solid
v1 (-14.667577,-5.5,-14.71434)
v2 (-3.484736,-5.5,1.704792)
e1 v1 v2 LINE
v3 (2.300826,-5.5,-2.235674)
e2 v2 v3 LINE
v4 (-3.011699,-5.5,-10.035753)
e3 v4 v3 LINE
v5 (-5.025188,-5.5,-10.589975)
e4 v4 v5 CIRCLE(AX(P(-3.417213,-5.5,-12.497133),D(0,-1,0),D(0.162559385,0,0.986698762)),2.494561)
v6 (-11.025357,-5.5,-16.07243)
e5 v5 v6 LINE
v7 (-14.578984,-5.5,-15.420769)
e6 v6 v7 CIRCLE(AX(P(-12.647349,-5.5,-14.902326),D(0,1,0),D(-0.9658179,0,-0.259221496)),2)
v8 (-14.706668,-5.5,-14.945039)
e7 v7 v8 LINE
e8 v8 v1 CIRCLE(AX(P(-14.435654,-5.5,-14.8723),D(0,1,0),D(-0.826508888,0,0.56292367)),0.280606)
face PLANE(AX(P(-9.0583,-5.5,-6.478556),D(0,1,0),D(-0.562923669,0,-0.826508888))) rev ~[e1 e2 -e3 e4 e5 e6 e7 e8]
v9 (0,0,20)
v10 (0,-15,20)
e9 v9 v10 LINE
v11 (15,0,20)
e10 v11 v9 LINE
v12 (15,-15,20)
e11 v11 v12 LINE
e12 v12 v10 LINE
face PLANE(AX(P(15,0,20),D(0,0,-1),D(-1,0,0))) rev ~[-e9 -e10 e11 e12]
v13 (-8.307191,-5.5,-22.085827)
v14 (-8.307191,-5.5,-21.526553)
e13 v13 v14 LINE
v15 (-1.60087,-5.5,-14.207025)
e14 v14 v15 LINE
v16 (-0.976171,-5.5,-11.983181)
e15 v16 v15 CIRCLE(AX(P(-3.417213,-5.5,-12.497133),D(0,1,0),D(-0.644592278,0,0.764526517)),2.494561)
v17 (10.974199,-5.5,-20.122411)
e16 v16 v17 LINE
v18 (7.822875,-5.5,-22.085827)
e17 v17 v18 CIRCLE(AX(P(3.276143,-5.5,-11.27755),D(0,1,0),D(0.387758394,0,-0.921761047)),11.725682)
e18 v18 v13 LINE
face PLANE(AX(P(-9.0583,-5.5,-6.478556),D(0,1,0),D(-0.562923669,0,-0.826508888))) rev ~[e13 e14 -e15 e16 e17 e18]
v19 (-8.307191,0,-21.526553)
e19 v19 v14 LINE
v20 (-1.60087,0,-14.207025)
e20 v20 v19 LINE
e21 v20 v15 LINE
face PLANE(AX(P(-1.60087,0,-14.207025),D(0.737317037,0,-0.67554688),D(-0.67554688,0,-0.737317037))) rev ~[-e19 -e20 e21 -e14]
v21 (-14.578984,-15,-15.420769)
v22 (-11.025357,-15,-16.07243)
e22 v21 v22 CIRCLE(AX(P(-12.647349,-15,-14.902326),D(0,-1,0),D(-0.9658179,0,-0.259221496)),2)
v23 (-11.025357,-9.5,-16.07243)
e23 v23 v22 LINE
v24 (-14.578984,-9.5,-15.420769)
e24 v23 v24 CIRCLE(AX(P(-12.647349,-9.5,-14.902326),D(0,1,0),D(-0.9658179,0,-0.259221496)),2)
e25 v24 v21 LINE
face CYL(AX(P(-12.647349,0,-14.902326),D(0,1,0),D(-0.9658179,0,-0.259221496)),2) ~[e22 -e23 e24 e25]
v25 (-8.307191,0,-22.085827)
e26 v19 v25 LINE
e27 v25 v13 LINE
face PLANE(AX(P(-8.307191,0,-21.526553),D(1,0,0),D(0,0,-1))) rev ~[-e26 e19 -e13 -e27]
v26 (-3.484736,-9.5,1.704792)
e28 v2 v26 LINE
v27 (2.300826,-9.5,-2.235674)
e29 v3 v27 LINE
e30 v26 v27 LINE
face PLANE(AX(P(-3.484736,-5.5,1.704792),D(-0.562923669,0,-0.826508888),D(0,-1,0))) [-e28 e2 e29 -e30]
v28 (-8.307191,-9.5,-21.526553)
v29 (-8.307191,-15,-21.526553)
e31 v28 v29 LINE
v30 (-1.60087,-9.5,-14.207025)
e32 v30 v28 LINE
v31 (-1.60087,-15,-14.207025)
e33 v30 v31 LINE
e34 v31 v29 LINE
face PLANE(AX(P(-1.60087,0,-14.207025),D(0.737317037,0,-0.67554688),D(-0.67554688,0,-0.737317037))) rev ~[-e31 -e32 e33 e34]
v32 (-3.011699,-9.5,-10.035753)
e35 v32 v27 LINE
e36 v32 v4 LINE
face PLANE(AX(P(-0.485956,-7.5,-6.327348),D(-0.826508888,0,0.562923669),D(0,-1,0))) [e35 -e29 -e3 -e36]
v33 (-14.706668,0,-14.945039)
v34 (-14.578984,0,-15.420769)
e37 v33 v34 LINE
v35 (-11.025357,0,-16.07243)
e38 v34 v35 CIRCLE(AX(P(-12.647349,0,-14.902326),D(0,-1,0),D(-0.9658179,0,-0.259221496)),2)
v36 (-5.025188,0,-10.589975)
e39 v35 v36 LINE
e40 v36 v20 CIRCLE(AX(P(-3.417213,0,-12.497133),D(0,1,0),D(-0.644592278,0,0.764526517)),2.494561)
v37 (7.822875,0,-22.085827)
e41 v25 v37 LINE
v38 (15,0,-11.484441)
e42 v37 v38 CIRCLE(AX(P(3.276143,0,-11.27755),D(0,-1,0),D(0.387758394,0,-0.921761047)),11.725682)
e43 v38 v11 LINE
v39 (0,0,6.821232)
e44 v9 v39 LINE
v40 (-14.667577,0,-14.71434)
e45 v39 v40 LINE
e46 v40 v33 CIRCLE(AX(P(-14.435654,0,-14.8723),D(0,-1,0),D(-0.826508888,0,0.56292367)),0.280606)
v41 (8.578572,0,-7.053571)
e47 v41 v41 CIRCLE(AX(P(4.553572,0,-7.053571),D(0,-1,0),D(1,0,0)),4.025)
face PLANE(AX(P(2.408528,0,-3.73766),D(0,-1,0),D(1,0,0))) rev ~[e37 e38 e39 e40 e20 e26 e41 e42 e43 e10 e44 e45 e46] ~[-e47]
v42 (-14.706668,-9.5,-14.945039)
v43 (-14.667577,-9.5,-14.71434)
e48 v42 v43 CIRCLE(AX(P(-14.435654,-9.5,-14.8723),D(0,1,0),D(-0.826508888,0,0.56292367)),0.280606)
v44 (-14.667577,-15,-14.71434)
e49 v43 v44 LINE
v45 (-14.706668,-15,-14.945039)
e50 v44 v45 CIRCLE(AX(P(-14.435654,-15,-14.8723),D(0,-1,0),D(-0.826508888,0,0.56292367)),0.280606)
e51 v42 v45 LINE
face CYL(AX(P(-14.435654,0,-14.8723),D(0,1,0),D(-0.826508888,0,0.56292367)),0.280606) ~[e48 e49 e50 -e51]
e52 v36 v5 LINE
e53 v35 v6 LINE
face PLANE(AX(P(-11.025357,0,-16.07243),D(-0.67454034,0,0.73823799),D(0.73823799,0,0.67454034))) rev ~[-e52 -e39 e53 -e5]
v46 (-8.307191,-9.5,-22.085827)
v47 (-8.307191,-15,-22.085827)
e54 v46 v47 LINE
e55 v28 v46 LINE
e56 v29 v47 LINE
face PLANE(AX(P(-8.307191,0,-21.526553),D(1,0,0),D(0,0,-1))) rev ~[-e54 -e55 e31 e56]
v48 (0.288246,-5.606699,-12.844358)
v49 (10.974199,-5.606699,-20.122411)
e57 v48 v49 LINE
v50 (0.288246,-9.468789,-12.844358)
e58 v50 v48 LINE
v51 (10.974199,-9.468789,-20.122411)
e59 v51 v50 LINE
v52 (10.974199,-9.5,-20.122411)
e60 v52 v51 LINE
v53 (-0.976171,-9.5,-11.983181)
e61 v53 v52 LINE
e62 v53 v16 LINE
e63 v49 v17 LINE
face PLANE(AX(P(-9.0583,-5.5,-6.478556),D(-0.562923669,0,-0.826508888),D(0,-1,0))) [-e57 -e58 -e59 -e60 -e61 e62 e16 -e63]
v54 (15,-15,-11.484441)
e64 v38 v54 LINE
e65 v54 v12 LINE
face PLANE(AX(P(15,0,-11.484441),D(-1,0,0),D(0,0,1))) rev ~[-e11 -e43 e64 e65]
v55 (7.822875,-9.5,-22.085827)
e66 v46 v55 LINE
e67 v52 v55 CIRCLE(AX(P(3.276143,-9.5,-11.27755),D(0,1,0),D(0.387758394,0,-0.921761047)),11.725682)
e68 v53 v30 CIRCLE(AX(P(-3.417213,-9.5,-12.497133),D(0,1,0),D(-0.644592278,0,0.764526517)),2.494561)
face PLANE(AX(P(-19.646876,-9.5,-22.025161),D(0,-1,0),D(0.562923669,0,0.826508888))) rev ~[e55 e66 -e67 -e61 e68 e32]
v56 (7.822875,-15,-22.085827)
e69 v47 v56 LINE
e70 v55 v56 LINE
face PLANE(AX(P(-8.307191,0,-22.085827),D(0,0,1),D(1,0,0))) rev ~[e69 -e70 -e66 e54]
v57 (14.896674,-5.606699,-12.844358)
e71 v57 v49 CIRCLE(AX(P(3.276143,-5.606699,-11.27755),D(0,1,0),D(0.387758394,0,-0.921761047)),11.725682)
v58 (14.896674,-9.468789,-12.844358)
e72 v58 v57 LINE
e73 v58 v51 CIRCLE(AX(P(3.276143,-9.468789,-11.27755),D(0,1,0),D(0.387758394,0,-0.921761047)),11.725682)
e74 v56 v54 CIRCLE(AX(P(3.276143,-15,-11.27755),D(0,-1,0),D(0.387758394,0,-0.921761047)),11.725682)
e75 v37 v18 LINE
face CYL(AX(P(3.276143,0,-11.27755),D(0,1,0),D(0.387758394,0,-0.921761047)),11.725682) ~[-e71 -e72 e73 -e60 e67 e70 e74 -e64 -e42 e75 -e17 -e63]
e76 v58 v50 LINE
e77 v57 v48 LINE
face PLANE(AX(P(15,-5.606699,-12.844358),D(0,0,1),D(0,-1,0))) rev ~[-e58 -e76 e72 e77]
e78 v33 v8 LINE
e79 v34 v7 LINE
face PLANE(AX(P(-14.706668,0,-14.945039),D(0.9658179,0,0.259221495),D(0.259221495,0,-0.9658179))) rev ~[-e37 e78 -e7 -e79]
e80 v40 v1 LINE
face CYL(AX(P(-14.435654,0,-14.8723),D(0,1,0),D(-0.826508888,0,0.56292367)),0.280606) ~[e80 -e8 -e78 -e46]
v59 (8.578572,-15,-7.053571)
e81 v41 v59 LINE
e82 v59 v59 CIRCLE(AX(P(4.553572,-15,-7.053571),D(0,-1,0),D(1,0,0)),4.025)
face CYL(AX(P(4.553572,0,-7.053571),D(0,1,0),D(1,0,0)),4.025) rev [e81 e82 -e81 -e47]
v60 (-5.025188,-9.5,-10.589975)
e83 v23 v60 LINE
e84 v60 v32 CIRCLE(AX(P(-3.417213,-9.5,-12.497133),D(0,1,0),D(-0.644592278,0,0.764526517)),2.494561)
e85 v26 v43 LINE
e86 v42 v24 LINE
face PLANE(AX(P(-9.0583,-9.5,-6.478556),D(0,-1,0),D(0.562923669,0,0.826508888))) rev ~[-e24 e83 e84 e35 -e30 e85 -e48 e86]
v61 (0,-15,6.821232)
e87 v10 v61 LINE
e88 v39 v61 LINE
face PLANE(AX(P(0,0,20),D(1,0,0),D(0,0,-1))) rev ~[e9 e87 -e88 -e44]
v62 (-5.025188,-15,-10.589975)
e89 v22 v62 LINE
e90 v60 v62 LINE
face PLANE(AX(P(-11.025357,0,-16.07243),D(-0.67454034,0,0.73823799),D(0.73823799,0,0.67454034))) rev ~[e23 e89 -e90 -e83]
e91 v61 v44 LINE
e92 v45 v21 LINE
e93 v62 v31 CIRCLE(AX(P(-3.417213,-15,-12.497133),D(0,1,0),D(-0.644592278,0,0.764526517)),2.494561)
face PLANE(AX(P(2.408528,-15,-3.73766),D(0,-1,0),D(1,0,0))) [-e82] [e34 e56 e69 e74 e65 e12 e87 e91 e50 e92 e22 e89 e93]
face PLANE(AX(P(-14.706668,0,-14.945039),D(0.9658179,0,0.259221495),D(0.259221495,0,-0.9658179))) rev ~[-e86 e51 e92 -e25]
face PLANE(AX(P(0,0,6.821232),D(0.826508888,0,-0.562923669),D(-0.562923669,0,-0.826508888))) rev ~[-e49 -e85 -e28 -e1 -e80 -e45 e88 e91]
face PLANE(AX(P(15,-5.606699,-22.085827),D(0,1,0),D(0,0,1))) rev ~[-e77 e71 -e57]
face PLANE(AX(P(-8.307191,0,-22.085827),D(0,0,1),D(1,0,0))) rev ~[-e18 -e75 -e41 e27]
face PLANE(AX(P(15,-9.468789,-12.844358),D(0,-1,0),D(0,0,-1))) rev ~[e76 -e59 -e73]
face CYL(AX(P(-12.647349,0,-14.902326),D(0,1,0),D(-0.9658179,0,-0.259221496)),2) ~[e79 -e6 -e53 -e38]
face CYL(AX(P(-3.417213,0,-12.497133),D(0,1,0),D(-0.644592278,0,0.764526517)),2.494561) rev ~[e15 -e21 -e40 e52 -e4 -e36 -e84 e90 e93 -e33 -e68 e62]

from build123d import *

# Parameters (mm, degrees)
F0_R     = 4.025
F1_DEPTH = 15
F2_W     = 4
F2_H     = 8.8454233903
F2_H_2   = 9.964544284
F3_DEPTH = 28.6711009125
F4_W     = 4
F4_H     = 9.9010998965
F5_DEPTH = 7
F7_DEPTH = 29.7172600886


# Not quite as in the source:
# - a feature names something its author has since deleted; it is built from what else it names


with BuildPart() as f1:
    # F0 (on Front) → F1 (new body)
    with BuildSketch(Plane.XZ):
        with BuildLine():
            Line((15, -11.0706584528), (15, 20))
            Line((15, 20), (0, 20))
            Line((0, 20), (0, 6.8212319165))
            Line((0, 6.8212319165), (-14.6675774532, -14.7143399477))
            ThreePointArc((-14.6675774532, -14.7143399477), (-14.7123164503, -14.8254204168), (-14.7066683885, -14.9450387593))
            Line((-14.7066683885, -14.9450387593), (-14.5789844453, -15.4207687435))
            ThreePointArc((-14.5789844453, -15.4207687435), (-13.0080916481, -16.8695228666), (-11.0253572607, -16.0724299998))
            Line((-11.0253572607, -16.0724299998), (-5.025187618, -10.5899751145))
            ThreePointArc((-5.025187618, -10.5899751145), (-1.6056896263, -10.7821354433), (-1.6008698149, -14.2070250586))
            Line((-1.6008698149, -14.2070250586), (-8.307190612, -21.5265534699))
            Line((-8.307190612, -21.5265534699), (-8.307190612, -22.085826844))
            Line((-8.307190612, -22.085826844), (7.8228749335, -22.085826844))
            ThreePointArc((7.8228749335, -22.085826844), (12.9859504737, -17.8510774103), (15, -11.4844412258))
            Line((15, -11.4844412258), (15, -11.0706584528))
        make_face()
        with Locations((4.5535718091, -7.0535713993)):
            Circle(F0_R, mode=Mode.SUBTRACT)
    extrude(amount=F1_DEPTH)

    # F2 (on face) → F3 (cut, through all)
    with BuildSketch(Plane(origin=(-3.1736560215, 0, 2.1615328257), x_dir=(0, -1, 0), z_dir=(-0.8265088883, 0, 0.5629236693))):
        with Locations((7.5, -24.8409709683)):
            Rectangle(F2_W, F2_H)
        with Locations((7.5, -15.4359871311)):
            Rectangle(F2_W, F2_H_2)
    extrude(amount=-F3_DEPTH, mode=Mode.SUBTRACT)

    # F4 (on face) → F5 (cut)
    with BuildSketch(Plane(origin=(-3.1736560215, 0, 2.1615328257), x_dir=(0, -1, 0), z_dir=(-0.8265088883, 0, 0.5629236693))):
        with Locations((7.5, -5.5031650409)):
            Rectangle(F4_W, F4_H)
    extrude(amount=-F5_DEPTH, mode=Mode.SUBTRACT)

    # F6 (on face) → F7 (cut, through all)
    with BuildSketch(Plane.YZ.offset(15)):
        Polygon((-9.4687892124, -16.3104510802), (-9.4687892124, -22.085826844), (-5.6066988036, -22.085826844), (-5.6066988036, -16.3104510802), (-5.6066988036, -12.8443576396), (-9.4687892124, -12.8443576396), align=None)
    extrude(amount=-F7_DEPTH, mode=Mode.SUBTRACT)


solid = f1.part
